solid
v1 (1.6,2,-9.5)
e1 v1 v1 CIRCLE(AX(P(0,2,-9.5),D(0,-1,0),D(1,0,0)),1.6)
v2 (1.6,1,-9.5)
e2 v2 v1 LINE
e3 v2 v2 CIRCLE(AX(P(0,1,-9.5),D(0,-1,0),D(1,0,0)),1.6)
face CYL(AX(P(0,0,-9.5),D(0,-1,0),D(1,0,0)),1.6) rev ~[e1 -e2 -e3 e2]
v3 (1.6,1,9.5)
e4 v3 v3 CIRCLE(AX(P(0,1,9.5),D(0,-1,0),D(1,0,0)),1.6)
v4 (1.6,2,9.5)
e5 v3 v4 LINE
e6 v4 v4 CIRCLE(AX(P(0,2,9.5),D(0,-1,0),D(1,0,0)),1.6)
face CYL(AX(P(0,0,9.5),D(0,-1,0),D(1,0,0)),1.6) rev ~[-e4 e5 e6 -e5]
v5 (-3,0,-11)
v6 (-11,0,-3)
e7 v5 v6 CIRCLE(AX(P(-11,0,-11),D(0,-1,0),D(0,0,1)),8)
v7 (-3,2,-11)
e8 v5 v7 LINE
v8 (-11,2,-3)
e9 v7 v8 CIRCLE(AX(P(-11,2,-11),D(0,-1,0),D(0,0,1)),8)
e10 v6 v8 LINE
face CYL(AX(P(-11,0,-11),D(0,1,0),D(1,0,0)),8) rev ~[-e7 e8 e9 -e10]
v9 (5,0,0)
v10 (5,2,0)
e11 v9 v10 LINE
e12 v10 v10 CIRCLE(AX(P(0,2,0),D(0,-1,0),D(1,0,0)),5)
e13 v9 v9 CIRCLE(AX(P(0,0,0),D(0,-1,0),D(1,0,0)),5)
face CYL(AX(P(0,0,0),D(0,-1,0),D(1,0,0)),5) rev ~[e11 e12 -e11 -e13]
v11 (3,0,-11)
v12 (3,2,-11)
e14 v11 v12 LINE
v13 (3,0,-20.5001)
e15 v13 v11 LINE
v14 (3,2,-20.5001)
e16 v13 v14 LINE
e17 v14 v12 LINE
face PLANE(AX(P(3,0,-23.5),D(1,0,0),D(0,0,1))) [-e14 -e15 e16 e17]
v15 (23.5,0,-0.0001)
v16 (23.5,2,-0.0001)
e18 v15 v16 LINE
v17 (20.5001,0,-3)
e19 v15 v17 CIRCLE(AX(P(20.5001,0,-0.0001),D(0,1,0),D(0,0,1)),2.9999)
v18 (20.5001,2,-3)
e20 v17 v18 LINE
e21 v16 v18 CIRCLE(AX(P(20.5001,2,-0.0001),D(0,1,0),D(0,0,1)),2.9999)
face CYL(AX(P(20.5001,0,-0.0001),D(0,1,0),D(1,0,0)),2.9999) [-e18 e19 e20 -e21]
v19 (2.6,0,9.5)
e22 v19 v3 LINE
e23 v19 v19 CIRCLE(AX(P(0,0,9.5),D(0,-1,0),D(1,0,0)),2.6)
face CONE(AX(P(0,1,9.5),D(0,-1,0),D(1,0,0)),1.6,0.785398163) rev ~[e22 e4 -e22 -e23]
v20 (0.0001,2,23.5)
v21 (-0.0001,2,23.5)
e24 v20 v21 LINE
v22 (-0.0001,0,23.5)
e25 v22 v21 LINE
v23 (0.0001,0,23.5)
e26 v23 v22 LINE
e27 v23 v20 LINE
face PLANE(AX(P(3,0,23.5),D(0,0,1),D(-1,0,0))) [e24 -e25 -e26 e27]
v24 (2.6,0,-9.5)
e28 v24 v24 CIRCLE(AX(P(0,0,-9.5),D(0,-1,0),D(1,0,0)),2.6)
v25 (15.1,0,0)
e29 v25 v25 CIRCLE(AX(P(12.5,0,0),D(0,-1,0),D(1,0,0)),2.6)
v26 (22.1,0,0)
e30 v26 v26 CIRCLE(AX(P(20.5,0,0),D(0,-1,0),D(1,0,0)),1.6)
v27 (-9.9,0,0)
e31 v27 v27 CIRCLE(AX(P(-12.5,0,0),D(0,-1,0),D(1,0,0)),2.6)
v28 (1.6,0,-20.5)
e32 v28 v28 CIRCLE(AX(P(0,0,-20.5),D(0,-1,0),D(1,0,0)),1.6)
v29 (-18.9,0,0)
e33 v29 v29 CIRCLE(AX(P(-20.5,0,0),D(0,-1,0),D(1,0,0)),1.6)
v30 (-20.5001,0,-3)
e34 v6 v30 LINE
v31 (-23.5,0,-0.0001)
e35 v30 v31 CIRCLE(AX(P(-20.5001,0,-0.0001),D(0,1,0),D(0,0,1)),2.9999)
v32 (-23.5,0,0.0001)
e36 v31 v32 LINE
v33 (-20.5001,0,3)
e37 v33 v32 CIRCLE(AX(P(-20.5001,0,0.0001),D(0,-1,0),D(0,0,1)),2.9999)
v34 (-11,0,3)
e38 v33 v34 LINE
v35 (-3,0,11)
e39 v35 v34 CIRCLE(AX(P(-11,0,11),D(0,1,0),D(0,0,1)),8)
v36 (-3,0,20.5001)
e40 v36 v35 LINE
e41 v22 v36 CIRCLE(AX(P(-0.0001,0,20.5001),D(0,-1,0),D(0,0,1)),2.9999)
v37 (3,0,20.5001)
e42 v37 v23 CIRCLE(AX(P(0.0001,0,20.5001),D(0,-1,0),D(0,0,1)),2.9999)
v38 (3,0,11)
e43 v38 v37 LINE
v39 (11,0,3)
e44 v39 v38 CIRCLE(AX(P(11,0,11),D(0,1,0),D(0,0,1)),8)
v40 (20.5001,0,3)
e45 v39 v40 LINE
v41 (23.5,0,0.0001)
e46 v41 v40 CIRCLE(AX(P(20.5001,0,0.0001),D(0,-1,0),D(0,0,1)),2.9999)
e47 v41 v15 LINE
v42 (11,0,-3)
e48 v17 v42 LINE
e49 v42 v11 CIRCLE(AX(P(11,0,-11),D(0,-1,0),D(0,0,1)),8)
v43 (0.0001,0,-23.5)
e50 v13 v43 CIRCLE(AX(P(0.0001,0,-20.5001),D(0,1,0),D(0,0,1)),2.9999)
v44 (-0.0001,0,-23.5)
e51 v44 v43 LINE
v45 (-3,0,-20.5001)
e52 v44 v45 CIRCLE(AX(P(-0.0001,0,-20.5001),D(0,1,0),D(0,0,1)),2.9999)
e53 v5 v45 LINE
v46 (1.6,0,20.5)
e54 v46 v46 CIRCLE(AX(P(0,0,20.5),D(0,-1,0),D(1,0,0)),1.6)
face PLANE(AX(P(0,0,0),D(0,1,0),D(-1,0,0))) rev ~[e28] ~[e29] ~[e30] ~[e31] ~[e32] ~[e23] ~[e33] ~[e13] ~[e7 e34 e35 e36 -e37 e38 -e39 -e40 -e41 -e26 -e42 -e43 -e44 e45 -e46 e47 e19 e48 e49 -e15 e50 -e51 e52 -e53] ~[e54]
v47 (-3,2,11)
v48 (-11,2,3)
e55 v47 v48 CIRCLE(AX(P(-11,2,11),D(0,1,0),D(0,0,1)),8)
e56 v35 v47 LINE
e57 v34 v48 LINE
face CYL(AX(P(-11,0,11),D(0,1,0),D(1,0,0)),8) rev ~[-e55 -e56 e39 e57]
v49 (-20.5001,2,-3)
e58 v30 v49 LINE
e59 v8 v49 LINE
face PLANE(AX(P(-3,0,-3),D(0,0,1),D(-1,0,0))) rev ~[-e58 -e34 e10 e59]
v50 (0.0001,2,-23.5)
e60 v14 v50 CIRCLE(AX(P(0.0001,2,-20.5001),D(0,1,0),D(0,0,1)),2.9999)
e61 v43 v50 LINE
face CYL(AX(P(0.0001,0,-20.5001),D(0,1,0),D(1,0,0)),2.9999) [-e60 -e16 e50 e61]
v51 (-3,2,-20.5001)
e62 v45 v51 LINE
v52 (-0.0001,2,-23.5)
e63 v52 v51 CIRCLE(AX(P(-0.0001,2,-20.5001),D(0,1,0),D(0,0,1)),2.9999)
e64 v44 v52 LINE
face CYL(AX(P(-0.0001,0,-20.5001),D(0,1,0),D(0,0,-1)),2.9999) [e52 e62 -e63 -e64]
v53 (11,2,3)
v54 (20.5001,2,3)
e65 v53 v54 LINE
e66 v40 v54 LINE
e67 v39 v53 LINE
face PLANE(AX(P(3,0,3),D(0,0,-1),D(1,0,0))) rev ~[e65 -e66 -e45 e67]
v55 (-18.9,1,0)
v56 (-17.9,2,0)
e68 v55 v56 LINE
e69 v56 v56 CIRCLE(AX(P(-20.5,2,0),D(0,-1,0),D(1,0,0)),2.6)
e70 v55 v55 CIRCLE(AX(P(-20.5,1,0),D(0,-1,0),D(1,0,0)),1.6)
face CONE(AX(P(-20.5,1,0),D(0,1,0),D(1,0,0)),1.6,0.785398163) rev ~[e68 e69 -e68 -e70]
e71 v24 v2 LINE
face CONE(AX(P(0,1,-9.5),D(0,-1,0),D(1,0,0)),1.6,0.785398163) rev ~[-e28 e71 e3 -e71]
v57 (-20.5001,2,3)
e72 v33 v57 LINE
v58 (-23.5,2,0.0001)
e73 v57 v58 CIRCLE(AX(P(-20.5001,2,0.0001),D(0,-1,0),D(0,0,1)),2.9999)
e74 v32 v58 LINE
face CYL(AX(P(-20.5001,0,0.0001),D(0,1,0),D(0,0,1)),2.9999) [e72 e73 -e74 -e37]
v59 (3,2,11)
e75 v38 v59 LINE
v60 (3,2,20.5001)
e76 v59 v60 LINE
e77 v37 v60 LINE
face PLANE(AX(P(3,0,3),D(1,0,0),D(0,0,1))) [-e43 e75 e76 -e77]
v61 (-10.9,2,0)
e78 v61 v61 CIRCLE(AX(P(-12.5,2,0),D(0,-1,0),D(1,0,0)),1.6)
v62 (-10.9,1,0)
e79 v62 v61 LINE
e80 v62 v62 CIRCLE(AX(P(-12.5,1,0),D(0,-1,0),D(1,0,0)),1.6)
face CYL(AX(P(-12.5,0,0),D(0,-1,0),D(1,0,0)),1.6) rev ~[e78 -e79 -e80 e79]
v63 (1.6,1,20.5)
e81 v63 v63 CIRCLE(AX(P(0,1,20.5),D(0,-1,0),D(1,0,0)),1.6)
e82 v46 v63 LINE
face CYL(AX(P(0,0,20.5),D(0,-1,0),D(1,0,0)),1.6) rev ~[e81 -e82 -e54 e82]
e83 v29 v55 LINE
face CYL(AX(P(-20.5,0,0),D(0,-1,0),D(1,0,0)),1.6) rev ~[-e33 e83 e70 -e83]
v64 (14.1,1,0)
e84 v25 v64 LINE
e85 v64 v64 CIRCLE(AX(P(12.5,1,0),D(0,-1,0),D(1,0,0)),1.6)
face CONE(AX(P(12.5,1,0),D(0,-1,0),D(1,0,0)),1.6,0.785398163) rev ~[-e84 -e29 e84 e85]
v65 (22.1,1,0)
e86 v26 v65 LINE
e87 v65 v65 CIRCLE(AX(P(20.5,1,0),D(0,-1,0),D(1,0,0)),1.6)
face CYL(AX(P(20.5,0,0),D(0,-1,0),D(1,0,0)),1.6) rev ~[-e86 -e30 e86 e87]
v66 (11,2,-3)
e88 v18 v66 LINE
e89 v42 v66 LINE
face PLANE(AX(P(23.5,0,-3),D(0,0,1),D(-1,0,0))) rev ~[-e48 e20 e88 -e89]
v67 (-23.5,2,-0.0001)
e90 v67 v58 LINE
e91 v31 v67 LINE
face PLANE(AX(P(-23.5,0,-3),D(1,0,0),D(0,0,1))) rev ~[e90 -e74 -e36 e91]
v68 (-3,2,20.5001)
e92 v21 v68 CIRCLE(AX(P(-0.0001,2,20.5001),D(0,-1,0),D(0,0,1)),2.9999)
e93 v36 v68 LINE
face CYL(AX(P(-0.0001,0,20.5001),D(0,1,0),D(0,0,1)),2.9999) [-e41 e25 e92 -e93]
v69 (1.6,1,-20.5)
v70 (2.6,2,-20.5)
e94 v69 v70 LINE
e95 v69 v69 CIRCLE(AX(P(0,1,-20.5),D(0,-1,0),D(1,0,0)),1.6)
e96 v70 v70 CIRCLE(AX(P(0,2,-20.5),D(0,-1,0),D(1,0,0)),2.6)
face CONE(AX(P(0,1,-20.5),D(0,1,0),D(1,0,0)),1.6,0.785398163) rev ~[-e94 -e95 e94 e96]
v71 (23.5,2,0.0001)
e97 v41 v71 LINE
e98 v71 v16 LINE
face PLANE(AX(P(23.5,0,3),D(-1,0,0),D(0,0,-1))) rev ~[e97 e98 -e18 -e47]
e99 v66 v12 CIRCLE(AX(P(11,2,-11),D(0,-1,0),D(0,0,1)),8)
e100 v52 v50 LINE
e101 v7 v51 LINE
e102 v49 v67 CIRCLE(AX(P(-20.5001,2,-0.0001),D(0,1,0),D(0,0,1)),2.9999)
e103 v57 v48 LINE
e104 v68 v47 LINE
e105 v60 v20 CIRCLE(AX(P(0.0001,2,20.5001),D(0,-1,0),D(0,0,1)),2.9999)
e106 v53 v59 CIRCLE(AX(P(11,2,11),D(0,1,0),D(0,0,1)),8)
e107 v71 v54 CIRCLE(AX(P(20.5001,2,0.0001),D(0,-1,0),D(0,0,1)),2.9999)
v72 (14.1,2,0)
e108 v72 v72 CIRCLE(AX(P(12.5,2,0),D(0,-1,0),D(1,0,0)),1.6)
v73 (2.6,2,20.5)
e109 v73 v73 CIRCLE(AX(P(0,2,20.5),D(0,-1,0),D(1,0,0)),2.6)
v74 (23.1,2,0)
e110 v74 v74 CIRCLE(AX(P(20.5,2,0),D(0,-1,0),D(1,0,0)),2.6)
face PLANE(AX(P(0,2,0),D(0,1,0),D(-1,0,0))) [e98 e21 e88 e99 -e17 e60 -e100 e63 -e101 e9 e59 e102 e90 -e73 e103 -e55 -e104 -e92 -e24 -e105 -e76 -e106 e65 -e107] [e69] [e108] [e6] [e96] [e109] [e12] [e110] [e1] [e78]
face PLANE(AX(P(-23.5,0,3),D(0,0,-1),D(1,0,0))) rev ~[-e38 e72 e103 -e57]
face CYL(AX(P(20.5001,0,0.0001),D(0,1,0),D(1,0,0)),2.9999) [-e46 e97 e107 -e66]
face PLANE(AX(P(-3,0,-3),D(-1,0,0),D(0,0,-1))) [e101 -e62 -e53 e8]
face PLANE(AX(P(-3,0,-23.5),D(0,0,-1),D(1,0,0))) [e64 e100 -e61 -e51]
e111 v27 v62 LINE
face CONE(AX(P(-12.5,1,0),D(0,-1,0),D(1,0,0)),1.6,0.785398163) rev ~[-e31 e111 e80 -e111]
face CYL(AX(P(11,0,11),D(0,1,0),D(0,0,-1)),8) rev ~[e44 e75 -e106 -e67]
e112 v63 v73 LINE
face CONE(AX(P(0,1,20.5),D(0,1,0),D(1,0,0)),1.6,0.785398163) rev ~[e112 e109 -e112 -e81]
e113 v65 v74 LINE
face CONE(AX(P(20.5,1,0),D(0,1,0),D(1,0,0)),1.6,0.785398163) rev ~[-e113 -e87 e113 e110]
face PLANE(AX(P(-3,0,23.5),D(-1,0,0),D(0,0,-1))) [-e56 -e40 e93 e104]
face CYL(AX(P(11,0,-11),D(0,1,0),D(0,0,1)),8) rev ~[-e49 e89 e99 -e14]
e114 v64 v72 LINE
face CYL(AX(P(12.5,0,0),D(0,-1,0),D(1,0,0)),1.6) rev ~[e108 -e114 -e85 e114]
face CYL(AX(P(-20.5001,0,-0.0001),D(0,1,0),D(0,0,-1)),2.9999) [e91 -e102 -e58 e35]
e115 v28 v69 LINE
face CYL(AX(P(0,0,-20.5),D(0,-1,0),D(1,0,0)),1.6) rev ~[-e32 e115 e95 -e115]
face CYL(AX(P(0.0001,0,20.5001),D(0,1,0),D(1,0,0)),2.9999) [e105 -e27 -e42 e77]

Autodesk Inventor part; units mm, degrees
ref_plane "YZ Plane" through (0, 0, 0) normal (1, 0, 0) x (0, 1, 0)
ref_plane "XZ Plane" through (0, 0, 0) normal (0, 1, 0) x (-1, 0, 0)
ref_plane "XY Plane" through (0, 0, 0) normal (0, 0, 1) x (1, 0, 0)
sketch "Skizze1" plane through (0, 0, 0) normal (0, 1, 0) x (-1, 0, 0)
  line L0 (-23.5, -3) -> (23.5, -3)
  line L1 (23.5, -3) -> (23.5, 3)
  line L2 (23.5, 3) -> (-23.5, 3)
  line L3 (-23.5, 3) -> (-23.5, -3)
  line L4 (-23.5, -3) -> (23.5, 3) construction
  line L5 (23.5, -3) -> (-23.5, 3) construction
  line L6 (3, -23.5) -> (-3, -23.5)
  line L7 (-3, -23.5) -> (-3, 23.5)
  line L8 (-3, 23.5) -> (3, 23.5)
  line L9 (3, 23.5) -> (3, -23.5)
  line L10 (3, -23.5) -> (-3, 23.5) construction
  line L11 (-3, -23.5) -> (3, 23.5) construction
  point P0 (0, 0)
  dimension "d0" = 6
  dimension "d1" = 47
extrude "Extrusion1" add sketch "Skizze1" along normal blind 2
sketch "Skizze2" plane through (0, 0, 0) normal (0, -1, 0) x (1, 0, 0)
  circle A0 centre (0, 20.5) radius 1.6
  circle A1 centre (0, -20.5) radius 1.6
  circle A2 centre (20.5, 0) radius 1.6
  circle A3 centre (-20.5, 0) radius 1.6
  line L0 (0, 20.5) -> (0, -20.5) construction
  line L1 (3, -3) -> (3, -23.5) construction
  line L2 (20.5, 0) -> (-20.5, 0) construction
  circle A4 centre (0, 9.5) radius 1.6
  circle A5 centre (0, -9.5) radius 1.6
  circle A6 centre (12.5, 0) radius 1.6
  circle A7 centre (-12.5, 0) radius 1.6
  line L3 (0, 9.5) -> (0, -9.5) construction
  line L4 (12.5, 0) -> (-12.5, 0) construction
  point P0 (0, 0)
  point P1 (0, 0)
  dimension "d4" = 3.2
  dimension "d5" = 41
  dimension "d7" = 19
  dimension "d8" = 25
extrude "Extrusion2" cut sketch "Skizze2" against normal blind 2
fillet "Rundung1" radius 3 8 edges at (-3, 1, 23.5) (3, 1, 23.5) (23.5, 1, 3) (23.5, 1, -3) (3, 1, -23.5) (-3, 1, -23.5) (-23.5, 1, -3) (-23.5, 1, 3)
fillet "Rundung2" radius 8 4 edges at (3, 1, 3) (-3, 1, 3) (-3, 1, -3) (3, 1, -3)
sketch "Skizze3" plane through (0, 0, 0) normal (0, -1, 0) x (1, 0, 0)
  circle A0 centre (0, 0) radius 5
  dimension "d13" = 10
extrude "Extrusion3" cut sketch "Skizze3" against normal blind 2
chamfer "Fase1" distance 1 angle 45 8 edges at (-1.6, 0, 9.5) (-14.1, 0, 0) (10.9, 0, 0) (-1.6, 0, -9.5) (-1.6, 2, 20.5) (-22.1, 2, 0) (18.9, 2, 0) (-1.6, 2, -20.5)
equation "\"G_L\" = 0"
equation "\"G_H\" = 0"
equation "\"G_B\" = 0"
properties part number "Motorkreuz" material "GEDA Stahl"
